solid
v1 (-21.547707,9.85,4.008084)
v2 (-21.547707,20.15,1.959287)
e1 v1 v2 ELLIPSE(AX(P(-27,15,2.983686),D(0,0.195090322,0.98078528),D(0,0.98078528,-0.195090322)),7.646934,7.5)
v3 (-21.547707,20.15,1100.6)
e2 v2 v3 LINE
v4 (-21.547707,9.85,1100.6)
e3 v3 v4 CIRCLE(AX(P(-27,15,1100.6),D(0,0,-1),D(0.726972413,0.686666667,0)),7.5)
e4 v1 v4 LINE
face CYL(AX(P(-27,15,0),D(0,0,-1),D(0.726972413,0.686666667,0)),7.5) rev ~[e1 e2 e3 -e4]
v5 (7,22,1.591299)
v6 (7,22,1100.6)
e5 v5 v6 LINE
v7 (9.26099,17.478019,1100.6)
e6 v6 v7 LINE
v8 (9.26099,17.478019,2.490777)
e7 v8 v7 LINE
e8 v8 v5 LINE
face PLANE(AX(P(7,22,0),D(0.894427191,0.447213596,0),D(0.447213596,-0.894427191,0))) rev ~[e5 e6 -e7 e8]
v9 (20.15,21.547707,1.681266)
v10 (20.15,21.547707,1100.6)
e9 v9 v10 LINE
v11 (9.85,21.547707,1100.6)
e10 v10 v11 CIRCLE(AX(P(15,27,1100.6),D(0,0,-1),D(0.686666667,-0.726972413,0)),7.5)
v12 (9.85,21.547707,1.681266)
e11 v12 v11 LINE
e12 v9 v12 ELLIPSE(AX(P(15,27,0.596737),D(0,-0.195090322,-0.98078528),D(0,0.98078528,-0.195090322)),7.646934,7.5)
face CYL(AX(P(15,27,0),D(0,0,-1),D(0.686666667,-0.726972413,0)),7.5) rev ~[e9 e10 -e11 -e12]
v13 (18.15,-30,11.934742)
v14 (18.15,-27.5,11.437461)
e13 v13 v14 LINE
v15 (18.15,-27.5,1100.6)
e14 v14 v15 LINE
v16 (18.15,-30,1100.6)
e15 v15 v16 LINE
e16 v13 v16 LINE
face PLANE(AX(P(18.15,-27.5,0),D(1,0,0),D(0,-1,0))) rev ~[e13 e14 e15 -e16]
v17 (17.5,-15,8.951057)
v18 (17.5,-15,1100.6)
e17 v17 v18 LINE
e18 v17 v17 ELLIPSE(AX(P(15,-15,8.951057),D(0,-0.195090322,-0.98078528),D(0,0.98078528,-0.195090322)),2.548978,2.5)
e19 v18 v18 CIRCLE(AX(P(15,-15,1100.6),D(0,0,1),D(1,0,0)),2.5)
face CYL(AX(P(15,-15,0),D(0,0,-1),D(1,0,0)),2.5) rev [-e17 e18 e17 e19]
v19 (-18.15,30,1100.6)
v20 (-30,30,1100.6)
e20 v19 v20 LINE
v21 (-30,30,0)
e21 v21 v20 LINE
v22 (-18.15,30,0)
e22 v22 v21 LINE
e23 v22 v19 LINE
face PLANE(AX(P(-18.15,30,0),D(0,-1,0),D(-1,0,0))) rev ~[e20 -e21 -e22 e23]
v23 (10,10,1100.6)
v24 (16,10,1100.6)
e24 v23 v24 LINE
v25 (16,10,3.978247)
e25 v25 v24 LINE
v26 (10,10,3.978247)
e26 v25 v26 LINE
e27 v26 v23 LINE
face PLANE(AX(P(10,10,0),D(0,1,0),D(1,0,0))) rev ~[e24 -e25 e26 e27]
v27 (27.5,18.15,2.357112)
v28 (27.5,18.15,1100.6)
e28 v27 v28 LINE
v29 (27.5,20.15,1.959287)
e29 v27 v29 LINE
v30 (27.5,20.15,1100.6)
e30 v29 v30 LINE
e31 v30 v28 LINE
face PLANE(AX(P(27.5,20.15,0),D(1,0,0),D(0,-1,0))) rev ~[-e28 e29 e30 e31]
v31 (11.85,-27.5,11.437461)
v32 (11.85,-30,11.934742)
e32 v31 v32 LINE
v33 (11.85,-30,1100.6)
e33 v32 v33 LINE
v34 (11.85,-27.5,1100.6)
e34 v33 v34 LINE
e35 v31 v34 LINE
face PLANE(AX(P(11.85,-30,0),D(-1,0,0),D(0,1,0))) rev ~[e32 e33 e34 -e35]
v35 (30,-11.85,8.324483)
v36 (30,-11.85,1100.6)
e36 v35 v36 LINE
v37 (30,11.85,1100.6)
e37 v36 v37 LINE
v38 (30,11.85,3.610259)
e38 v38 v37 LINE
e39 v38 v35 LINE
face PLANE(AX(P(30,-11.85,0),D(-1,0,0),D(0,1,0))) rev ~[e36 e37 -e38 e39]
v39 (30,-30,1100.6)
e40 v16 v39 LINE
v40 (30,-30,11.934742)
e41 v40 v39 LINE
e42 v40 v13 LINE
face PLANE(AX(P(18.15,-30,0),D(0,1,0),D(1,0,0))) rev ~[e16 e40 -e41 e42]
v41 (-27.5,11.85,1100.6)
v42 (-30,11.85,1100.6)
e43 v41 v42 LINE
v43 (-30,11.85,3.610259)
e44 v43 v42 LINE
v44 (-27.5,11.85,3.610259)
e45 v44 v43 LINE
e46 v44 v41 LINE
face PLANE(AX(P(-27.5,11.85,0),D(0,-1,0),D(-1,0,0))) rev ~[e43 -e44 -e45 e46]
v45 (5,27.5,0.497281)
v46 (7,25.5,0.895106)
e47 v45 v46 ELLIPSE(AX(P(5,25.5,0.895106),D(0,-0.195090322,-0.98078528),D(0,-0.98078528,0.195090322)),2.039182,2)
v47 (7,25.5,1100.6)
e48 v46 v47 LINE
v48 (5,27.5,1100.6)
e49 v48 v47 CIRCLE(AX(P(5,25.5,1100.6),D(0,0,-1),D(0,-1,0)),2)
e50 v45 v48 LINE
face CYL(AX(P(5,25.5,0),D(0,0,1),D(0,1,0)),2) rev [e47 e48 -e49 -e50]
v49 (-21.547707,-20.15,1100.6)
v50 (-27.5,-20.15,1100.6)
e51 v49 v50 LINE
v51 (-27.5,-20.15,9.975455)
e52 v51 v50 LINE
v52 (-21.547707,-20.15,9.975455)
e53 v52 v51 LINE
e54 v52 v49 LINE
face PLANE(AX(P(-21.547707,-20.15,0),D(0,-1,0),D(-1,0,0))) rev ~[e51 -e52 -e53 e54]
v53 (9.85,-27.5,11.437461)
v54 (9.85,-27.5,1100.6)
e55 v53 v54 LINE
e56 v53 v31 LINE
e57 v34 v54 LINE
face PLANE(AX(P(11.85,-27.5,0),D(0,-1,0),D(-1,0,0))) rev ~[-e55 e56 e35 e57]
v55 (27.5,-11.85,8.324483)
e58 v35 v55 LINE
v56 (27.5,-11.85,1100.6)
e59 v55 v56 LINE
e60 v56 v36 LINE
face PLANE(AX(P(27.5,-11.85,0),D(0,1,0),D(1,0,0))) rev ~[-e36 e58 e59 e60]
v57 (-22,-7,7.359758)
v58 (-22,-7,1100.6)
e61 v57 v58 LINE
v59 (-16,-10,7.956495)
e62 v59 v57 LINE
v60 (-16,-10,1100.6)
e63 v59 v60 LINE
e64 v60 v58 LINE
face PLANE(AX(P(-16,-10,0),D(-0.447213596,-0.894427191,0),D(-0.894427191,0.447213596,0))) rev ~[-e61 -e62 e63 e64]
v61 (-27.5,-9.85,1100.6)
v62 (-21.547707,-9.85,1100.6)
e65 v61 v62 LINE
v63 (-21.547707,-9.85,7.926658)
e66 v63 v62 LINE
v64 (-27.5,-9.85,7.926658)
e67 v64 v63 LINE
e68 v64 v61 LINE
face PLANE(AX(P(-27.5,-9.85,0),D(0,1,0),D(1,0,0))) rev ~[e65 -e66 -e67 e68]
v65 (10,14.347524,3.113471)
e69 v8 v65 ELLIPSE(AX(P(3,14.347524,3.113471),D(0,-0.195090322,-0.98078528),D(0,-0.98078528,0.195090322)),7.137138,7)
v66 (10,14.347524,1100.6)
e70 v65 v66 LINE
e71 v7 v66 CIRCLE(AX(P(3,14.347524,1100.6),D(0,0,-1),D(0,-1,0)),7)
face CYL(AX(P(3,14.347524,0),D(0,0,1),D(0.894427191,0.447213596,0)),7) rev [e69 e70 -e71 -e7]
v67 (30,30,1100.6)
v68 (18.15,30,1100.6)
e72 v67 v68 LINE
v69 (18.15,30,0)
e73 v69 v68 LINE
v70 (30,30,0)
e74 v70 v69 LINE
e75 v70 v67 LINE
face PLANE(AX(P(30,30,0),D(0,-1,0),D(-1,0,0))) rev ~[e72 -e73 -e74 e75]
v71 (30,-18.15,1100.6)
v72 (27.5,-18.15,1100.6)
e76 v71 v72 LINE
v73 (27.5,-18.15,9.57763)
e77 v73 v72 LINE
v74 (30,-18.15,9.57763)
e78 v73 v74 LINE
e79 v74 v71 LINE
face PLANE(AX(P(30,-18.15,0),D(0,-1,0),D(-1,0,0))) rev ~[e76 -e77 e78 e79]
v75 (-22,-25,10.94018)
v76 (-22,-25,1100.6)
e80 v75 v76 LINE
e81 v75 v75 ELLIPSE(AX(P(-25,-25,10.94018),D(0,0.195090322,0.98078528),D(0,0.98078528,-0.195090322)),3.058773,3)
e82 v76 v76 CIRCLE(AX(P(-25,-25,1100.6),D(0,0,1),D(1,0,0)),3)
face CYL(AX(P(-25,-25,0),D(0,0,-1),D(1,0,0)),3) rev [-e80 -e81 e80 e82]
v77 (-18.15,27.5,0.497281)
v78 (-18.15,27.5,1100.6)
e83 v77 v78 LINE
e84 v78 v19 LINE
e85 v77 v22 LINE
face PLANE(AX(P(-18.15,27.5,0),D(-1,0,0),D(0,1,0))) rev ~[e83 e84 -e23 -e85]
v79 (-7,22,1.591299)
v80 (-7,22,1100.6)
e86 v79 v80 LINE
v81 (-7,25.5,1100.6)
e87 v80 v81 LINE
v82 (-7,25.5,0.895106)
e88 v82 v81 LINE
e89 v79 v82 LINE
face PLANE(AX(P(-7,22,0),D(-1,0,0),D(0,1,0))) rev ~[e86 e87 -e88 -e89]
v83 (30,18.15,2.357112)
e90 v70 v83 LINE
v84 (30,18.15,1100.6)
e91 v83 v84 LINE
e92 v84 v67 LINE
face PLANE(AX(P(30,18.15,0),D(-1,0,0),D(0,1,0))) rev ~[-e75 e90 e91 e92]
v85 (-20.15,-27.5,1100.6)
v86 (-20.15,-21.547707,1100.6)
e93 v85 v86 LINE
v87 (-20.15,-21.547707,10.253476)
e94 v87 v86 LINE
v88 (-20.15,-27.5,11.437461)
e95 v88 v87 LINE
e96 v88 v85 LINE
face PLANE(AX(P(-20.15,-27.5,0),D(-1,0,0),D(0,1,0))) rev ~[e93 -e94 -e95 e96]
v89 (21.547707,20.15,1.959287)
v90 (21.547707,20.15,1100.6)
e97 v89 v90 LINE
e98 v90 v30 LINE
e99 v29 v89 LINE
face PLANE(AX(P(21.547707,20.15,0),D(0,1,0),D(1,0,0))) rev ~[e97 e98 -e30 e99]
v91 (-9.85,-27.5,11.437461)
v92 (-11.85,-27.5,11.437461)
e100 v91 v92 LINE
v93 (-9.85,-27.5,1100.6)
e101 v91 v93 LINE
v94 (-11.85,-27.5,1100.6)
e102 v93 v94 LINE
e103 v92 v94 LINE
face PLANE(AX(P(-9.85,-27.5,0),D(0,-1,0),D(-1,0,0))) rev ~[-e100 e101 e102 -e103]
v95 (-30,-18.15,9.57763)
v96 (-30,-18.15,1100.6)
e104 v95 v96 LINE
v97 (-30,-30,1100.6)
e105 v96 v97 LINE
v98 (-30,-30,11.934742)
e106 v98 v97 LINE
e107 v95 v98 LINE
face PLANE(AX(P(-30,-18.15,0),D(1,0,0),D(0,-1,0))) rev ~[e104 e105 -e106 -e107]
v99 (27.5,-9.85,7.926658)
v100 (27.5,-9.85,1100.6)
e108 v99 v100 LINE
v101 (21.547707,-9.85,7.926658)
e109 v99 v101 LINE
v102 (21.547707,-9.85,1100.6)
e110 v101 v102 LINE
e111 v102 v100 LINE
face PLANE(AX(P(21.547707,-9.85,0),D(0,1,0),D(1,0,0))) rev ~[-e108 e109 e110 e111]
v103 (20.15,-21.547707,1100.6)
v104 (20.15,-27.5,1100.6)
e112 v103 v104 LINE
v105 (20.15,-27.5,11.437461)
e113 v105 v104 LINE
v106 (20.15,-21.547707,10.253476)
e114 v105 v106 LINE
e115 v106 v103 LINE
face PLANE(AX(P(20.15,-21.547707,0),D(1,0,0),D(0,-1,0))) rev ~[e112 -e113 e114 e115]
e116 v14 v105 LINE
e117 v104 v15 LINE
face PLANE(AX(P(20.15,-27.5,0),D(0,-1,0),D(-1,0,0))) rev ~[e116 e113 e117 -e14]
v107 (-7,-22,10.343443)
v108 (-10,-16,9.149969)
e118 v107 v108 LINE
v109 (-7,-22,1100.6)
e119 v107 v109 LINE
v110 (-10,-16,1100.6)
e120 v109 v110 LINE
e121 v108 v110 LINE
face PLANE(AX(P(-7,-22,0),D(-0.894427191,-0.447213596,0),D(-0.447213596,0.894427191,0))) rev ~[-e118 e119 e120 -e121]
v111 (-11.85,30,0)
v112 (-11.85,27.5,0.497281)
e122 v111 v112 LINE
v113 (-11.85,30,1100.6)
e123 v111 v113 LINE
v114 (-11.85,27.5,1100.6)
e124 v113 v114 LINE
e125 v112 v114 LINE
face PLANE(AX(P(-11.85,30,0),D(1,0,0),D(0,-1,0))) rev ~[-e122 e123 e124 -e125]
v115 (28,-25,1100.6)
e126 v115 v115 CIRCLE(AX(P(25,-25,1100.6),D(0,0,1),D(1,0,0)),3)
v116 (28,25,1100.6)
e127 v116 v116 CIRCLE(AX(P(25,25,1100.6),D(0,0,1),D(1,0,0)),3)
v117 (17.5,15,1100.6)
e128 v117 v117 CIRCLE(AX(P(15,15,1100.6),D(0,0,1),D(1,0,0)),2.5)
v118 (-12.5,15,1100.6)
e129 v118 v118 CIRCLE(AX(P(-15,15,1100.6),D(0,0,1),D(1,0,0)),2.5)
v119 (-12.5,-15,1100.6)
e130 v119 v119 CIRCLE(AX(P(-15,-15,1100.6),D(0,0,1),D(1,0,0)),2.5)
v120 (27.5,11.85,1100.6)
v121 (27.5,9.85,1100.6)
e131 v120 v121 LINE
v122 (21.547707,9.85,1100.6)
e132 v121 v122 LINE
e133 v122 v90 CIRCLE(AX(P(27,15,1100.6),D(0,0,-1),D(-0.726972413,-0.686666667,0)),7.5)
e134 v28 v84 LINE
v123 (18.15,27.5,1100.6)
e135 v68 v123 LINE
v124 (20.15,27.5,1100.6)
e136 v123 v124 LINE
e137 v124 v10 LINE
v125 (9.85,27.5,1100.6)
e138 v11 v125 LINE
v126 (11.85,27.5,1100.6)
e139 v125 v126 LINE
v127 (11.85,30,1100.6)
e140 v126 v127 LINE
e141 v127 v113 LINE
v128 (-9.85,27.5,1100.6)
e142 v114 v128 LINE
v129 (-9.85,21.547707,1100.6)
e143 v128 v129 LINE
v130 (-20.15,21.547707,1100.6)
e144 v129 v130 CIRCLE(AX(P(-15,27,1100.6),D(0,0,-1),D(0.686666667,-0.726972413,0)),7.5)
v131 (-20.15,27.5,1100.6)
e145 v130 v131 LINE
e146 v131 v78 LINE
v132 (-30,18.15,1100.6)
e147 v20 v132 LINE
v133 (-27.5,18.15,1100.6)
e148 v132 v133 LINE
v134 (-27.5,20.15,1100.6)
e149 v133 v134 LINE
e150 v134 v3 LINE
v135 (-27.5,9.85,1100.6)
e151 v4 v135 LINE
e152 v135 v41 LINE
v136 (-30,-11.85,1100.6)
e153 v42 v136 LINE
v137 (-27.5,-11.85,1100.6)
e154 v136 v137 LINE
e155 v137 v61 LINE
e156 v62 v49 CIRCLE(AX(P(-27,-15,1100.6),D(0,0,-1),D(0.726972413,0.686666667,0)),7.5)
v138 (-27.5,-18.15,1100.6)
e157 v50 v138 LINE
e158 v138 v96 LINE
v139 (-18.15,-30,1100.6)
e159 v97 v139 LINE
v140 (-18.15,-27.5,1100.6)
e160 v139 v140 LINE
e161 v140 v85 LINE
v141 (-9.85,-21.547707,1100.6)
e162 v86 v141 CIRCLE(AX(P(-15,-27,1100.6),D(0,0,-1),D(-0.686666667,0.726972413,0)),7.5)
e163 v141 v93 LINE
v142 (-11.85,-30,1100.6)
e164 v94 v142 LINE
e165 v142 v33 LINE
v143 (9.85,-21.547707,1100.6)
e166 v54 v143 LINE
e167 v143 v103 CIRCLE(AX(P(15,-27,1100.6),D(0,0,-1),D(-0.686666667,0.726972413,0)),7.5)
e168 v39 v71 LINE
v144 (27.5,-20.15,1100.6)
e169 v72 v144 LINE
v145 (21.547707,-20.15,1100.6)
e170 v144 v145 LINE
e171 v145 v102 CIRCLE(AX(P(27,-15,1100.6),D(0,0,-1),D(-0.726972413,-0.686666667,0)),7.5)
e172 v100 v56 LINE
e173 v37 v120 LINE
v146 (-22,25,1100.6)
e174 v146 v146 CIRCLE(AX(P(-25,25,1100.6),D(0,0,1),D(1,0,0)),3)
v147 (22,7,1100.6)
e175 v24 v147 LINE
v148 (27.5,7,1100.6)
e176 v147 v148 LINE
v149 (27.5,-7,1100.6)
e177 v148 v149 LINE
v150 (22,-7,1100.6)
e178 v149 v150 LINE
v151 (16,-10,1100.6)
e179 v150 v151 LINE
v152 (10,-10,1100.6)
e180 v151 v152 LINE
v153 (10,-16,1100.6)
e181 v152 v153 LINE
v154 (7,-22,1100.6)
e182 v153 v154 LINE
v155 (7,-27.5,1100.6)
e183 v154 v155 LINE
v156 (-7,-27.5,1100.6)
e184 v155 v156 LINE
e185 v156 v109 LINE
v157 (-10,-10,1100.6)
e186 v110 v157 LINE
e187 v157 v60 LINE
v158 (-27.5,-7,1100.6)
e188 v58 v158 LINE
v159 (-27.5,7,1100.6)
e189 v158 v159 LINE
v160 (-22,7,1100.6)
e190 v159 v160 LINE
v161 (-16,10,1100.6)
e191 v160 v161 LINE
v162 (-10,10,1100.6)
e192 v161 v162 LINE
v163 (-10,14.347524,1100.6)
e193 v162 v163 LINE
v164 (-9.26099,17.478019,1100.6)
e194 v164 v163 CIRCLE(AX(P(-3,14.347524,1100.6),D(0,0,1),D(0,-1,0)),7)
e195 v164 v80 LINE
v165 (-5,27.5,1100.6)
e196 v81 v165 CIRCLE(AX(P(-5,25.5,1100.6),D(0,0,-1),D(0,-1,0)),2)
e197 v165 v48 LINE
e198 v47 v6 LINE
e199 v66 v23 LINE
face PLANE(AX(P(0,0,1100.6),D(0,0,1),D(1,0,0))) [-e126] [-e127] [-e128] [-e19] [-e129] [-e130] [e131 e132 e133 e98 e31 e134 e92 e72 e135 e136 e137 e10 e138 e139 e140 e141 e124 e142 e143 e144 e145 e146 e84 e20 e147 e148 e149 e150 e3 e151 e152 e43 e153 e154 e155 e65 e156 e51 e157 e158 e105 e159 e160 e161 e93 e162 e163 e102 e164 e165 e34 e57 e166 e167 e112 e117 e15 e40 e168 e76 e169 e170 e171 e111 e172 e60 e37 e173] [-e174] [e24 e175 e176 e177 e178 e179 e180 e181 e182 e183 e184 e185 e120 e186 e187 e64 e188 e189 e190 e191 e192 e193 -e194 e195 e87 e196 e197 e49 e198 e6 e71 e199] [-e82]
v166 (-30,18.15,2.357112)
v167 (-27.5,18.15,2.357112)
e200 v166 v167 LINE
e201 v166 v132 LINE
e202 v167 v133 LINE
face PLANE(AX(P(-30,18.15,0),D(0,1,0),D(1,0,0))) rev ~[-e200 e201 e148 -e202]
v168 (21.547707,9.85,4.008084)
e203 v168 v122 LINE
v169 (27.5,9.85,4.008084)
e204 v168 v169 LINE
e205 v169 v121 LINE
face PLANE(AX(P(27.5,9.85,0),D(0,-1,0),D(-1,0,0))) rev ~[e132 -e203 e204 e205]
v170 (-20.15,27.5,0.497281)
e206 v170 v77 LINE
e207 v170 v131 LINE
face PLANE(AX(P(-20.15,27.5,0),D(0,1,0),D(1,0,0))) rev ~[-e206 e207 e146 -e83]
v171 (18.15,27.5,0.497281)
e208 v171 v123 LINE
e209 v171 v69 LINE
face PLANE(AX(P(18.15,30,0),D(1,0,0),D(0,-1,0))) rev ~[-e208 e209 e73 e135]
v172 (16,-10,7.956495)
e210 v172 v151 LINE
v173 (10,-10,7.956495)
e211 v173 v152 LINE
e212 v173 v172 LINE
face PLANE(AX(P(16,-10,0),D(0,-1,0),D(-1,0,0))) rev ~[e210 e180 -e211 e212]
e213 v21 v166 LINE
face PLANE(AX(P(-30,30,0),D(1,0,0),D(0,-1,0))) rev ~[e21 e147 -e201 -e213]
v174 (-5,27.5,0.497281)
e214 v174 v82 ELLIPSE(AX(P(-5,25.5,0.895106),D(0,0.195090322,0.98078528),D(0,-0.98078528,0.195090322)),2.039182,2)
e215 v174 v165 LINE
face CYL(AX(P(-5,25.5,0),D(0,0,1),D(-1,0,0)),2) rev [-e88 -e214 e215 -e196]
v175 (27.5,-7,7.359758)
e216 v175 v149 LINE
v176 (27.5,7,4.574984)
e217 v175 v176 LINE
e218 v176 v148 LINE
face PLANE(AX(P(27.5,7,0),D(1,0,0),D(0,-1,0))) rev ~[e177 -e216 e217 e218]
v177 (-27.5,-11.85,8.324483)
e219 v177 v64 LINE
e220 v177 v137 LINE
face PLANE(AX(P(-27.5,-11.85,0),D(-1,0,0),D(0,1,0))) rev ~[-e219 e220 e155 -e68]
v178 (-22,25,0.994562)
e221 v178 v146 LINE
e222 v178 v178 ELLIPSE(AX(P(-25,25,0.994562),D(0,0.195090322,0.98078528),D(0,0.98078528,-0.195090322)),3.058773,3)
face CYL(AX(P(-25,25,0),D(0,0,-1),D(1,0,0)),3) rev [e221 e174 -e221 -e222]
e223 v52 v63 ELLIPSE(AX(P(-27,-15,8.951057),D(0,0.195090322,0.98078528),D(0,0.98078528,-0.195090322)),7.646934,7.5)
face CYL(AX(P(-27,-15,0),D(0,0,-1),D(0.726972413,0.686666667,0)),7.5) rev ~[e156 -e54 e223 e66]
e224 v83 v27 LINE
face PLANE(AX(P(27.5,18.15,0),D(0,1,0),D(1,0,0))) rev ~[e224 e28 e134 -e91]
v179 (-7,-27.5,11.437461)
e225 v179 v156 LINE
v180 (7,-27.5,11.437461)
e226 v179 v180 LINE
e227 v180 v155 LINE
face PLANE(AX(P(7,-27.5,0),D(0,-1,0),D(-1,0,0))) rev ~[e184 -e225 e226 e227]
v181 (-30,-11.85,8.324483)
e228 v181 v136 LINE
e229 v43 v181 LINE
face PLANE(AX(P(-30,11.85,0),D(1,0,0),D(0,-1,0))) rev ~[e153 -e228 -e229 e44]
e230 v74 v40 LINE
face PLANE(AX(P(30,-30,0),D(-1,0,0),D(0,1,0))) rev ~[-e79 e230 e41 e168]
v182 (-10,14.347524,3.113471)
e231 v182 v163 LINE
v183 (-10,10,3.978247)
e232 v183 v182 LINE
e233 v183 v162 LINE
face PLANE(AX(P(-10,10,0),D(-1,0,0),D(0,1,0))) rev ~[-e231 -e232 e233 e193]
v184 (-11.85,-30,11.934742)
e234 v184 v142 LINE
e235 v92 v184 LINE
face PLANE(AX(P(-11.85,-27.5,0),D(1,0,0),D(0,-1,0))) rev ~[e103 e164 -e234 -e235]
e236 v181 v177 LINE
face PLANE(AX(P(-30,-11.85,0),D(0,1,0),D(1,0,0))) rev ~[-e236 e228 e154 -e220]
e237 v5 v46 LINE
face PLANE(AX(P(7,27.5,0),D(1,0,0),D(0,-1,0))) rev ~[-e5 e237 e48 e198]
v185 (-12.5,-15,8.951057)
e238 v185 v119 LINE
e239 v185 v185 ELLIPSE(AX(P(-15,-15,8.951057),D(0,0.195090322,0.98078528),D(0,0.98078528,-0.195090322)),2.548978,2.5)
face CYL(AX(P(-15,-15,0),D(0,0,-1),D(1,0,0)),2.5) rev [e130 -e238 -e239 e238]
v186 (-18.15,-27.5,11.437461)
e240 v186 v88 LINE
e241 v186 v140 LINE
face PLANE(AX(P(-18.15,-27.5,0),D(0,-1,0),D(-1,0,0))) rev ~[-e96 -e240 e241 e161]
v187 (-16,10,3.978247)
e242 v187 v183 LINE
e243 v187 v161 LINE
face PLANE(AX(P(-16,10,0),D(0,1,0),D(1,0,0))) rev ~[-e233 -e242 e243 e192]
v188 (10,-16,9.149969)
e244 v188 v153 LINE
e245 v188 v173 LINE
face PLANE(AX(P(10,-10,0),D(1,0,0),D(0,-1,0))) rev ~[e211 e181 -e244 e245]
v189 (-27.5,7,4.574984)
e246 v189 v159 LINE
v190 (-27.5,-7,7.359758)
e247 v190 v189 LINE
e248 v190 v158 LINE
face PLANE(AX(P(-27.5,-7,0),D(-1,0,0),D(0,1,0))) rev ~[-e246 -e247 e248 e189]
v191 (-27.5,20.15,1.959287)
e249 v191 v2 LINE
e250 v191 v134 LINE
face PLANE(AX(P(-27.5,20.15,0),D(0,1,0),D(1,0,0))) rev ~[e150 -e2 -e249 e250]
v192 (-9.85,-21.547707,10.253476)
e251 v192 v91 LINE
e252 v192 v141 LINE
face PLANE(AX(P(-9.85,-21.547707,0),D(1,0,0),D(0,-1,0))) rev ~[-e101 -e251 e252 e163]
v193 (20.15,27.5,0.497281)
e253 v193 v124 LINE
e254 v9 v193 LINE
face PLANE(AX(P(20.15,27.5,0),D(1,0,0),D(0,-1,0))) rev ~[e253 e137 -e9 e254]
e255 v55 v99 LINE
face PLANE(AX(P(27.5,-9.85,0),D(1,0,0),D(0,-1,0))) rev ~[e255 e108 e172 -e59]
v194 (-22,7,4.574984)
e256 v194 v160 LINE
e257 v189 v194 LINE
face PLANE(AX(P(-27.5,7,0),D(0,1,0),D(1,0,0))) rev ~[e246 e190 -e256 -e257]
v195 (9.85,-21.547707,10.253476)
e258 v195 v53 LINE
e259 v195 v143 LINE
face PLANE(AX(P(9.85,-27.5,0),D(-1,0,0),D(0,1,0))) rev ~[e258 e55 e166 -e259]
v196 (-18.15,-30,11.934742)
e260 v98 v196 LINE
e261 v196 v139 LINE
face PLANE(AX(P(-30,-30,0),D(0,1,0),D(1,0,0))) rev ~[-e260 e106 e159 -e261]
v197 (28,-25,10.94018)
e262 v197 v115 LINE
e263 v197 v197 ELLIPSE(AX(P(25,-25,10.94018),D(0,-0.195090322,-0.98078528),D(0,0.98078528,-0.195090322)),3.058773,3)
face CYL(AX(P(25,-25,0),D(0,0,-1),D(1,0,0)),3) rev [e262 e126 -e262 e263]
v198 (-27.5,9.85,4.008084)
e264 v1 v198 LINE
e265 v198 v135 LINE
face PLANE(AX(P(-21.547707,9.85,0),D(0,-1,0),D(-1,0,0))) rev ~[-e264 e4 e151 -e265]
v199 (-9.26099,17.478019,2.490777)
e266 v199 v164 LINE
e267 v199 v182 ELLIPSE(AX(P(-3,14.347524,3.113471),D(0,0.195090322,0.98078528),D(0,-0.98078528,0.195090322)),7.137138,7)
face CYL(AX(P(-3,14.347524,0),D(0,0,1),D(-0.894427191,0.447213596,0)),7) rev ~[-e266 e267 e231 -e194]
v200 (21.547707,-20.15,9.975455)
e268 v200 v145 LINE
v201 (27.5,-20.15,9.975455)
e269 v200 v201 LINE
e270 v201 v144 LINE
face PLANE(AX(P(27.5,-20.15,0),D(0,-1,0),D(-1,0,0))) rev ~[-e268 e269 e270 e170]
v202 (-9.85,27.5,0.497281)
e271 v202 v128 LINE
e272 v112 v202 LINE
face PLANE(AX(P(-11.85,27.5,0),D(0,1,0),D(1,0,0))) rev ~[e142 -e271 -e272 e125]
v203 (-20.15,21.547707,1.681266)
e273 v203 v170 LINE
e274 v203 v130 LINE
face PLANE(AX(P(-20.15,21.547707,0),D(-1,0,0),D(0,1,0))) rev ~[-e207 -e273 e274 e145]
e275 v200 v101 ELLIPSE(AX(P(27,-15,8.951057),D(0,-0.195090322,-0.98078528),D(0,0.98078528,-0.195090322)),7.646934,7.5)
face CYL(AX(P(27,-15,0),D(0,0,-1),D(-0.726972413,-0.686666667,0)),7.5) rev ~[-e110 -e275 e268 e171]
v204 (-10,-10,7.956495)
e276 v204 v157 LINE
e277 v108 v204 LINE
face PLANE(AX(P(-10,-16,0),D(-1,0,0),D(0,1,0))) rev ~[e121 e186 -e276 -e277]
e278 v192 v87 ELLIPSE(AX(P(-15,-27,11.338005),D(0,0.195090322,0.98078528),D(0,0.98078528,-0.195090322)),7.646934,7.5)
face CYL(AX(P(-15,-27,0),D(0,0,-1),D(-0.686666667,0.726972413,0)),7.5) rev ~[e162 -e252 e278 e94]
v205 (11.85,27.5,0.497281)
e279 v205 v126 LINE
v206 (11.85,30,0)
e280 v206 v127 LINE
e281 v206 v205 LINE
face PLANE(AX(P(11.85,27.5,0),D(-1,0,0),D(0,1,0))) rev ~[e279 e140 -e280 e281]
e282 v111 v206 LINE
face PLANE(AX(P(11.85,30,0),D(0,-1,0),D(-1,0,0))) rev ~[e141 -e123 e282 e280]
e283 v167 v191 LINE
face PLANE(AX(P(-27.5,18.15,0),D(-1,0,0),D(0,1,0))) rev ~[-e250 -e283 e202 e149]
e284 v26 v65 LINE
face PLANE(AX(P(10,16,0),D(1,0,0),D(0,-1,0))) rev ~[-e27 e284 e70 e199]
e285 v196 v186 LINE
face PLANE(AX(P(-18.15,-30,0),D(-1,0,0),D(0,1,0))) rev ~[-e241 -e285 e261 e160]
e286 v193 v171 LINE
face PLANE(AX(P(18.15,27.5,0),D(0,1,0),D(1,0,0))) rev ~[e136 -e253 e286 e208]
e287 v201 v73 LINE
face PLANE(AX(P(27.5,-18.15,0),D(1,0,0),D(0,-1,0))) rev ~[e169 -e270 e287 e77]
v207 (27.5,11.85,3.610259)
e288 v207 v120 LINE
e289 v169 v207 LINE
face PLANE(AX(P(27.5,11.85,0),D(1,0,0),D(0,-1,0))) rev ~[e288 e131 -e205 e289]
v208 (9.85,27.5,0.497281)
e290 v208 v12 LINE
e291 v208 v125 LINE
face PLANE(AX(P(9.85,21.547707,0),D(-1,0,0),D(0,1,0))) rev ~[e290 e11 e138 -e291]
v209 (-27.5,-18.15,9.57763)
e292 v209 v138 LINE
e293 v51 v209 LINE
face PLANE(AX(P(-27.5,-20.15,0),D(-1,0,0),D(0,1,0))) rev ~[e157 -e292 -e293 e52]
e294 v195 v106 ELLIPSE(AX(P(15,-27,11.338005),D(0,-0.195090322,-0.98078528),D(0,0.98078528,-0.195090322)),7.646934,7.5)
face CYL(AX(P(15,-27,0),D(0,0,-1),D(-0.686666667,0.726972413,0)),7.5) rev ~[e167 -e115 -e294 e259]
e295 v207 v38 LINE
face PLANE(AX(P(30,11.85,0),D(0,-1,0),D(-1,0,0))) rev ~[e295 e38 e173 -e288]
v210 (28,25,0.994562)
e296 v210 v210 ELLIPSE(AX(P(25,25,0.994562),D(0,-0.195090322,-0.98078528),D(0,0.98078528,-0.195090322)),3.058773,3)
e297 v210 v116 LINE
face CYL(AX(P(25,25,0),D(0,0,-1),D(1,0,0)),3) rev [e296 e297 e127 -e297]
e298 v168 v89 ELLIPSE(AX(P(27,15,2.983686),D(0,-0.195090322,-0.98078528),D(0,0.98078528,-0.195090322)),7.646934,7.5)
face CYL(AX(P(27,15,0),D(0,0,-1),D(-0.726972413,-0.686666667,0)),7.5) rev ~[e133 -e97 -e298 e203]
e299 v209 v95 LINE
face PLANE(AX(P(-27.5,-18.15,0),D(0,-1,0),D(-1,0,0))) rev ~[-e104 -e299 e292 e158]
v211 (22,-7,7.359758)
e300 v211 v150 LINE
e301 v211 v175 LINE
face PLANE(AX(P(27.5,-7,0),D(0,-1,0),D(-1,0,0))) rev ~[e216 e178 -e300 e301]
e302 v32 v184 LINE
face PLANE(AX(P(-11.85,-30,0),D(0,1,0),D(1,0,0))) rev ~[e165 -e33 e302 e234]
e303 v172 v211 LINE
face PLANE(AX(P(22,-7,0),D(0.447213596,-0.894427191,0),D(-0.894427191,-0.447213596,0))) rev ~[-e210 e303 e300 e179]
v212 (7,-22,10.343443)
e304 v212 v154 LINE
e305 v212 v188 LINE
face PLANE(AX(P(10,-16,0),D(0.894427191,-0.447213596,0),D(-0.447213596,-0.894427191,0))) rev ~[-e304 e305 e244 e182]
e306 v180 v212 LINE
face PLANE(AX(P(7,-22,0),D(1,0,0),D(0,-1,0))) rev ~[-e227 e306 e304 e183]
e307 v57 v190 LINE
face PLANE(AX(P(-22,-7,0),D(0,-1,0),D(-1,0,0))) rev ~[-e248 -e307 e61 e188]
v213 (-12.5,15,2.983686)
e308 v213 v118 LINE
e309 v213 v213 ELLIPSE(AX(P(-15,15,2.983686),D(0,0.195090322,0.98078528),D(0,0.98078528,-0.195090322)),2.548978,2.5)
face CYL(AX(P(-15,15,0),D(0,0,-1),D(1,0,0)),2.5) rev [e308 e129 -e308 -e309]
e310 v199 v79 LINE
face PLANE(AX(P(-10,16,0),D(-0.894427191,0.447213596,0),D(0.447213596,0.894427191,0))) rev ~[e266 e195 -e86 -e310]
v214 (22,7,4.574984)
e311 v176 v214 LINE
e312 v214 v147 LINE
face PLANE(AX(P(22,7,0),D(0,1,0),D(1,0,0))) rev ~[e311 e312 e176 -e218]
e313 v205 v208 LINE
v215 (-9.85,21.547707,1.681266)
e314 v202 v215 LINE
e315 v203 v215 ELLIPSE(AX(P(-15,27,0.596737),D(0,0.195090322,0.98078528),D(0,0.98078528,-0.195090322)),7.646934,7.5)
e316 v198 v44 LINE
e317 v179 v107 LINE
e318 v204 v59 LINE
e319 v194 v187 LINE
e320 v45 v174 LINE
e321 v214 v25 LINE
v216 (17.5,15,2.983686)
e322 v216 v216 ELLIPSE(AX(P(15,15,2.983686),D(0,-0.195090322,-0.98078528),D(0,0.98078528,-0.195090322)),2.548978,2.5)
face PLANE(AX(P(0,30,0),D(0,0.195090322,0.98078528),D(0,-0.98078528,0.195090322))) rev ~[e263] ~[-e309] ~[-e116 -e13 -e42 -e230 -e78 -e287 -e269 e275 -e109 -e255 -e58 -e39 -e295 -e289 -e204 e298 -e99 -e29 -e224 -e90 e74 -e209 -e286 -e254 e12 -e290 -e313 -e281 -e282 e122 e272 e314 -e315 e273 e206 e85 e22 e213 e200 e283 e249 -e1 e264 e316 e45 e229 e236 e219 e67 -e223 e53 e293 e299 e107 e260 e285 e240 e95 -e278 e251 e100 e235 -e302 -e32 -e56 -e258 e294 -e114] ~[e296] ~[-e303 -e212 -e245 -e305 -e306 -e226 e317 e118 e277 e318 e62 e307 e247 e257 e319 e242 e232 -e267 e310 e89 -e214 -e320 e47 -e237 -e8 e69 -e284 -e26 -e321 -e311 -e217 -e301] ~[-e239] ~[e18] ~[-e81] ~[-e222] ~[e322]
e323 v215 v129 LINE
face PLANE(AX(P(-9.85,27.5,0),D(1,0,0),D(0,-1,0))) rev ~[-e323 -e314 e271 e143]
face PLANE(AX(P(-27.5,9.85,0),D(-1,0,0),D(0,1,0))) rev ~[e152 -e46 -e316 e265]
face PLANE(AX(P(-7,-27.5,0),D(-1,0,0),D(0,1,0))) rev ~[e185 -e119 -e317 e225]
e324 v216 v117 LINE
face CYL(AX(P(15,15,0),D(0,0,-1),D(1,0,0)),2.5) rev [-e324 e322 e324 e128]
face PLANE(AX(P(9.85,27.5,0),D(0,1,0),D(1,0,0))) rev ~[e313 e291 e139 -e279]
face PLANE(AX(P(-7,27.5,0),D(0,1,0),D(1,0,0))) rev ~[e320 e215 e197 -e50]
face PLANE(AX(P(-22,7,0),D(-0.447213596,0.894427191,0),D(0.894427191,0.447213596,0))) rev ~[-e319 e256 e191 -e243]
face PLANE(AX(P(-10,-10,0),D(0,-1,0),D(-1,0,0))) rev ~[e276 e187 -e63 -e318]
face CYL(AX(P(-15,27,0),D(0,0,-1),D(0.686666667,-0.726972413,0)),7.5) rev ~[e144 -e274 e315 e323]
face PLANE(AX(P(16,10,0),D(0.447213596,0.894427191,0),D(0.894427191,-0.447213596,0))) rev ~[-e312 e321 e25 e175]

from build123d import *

# Parameters (mm, degrees)
F0_R          = 3
F0_R_2        = 2.5
F1_DEPTH      = 1100.6
F2_R          = 2
F3_R          = 7
F5_DEPTH      = 30
F5_DEPTH_BACK = 30


# Not quite as in the source:
# - a feature names something its author has since deleted; it is built from what else it names


with BuildPart() as f1:
    # F0 (on Top) → F1 (new body)
    with BuildSketch(Plane.XY):
        with BuildLine():
            Line((18.15, -30), (30, -30))
            Line((30, -30), (30, -18.15))
            Line((30, -18.15), (27.5, -18.15))
            Line((27.5, -18.15), (27.5, -20.15))
            Line((27.5, -20.15), (21.5477069044, -20.15))
            ThreePointArc((21.5477069044, -20.15), (19.5, -15), (21.5477069044, -9.85))
            Line((21.5477069044, -9.85), (27.5, -9.85))
            Line((27.5, -9.85), (27.5, -11.85))
            Line((27.5, -11.85), (30, -11.85))
            Line((30, -11.85), (30, 11.85))
            Line((30, 11.85), (27.5, 11.85))
            Line((27.5, 11.85), (27.5, 9.85))
            Line((27.5, 9.85), (21.5477069044, 9.85))
            ThreePointArc((21.5477069044, 9.85), (19.5, 15), (21.5477069044, 20.15))
            Line((21.5477069044, 20.15), (27.5, 20.15))
            Line((27.5, 20.15), (27.5, 18.15))
            Line((27.5, 18.15), (30, 18.15))
            Line((30, 18.15), (30, 30))
            Line((30, 30), (18.15, 30))
            Line((18.15, 30), (18.15, 27.5))
            Line((18.15, 27.5), (20.15, 27.5))
            Line((20.15, 27.5), (20.15, 21.5477069044))
            ThreePointArc((20.15, 21.5477069044), (15, 19.5), (9.85, 21.5477069044))
            Line((9.85, 21.5477069044), (9.85, 27.5))
            Line((9.85, 27.5), (11.85, 27.5))
            Line((11.85, 27.5), (11.85, 30))
            Line((11.85, 30), (-11.85, 30))
            Line((-11.85, 30), (-11.85, 27.5))
            Line((-11.85, 27.5), (-9.85, 27.5))
            Line((-9.85, 27.5), (-9.85, 21.5477069044))
            ThreePointArc((-9.85, 21.5477069044), (-15, 19.5), (-20.15, 21.5477069044))
            Line((-20.15, 21.5477069044), (-20.15, 27.5))
            Line((-20.15, 27.5), (-18.15, 27.5))
            Line((-18.15, 27.5), (-18.15, 30))
            Line((-18.15, 30), (-30, 30))
            Line((-30, 30), (-30, 18.15))
            Line((-30, 18.15), (-27.5, 18.15))
            Line((-27.5, 18.15), (-27.5, 20.15))
            Line((-27.5, 20.15), (-21.5477069044, 20.15))
            ThreePointArc((-21.5477069044, 20.15), (-19.5, 15), (-21.5477069044, 9.85))
            Line((-21.5477069044, 9.85), (-27.5, 9.85))
            Line((-27.5, 9.85), (-27.5, 11.85))
            Line((-27.5, 11.85), (-30, 11.85))
            Line((-30, 11.85), (-30, -11.85))
            Line((-30, -11.85), (-27.5, -11.85))
            Line((-27.5, -11.85), (-27.5, -9.85))
            Line((-27.5, -9.85), (-21.5477069044, -9.85))
            ThreePointArc((-21.5477069044, -9.85), (-19.5, -15), (-21.5477069044, -20.15))
            Line((-21.5477069044, -20.15), (-27.5, -20.15))
            Line((-27.5, -20.15), (-27.5, -18.15))
            Line((-27.5, -18.15), (-30, -18.15))
            Line((-30, -18.15), (-30, -30))
            Line((-30, -30), (-18.15, -30))
            Line((-18.15, -30), (-18.15, -27.5))
            Line((-18.15, -27.5), (-20.15, -27.5))
            Line((-20.15, -27.5), (-20.15, -21.5477069044))
            ThreePointArc((-20.15, -21.5477069044), (-15, -19.5), (-9.85, -21.5477069044))
            Line((-9.85, -21.5477069044), (-9.85, -27.5))
            Line((-9.85, -27.5), (-11.85, -27.5))
            Line((-11.85, -27.5), (-11.85, -30))
            Line((-11.85, -30), (11.85, -30))
            Line((11.85, -30), (11.85, -27.5))
            Line((11.85, -27.5), (9.85, -27.5))
            Line((9.85, -27.5), (9.85, -21.5477069044))
            ThreePointArc((9.85, -21.5477069044), (15, -19.5), (20.15, -21.5477069044))
            Line((20.15, -21.5477069044), (20.15, -27.5))
            Line((20.15, -27.5), (18.15, -27.5))
            Line((18.15, -27.5), (18.15, -30))
        make_face()
        with Locations((-25, -25)):
            Circle(F0_R, mode=Mode.SUBTRACT)
        with Locations((-15, -15)):
            Circle(F0_R_2, mode=Mode.SUBTRACT)
        with Locations((25, -25)):
            Circle(F0_R, mode=Mode.SUBTRACT)
        with Locations((15, -15)):
            Circle(F0_R_2, mode=Mode.SUBTRACT)
        with Locations((-25, 25)):
            Circle(F0_R, mode=Mode.SUBTRACT)
        with Locations((-15, 15)):
            Circle(F0_R_2, mode=Mode.SUBTRACT)
        Polygon((-7, 22), (-7, 27.5), (0, 27.5), (7, 27.5), (7, 22), (10, 16), (10, 10), (16, 10), (22, 7), (27.5, 7), (27.5, 0), (27.5, -7), (22, -7), (16, -10), (10, -10), (10, -16), (7, -22), (7, -27.5), (0, -27.5), (-7, -27.5), (-7, -22), (-10, -16), (-10, -10), (-16, -10), (-22, -7), (-27.5, -7), (-27.5, 0), (-27.5, 7), (-22, 7), (-16, 10), (-10, 10), (-10, 16), align=None, mode=Mode.SUBTRACT)
        with Locations((15, 15)):
            Circle(F0_R_2, mode=Mode.SUBTRACT)
        with Locations((25, 25)):
            Circle(F0_R, mode=Mode.SUBTRACT)
    extrude(amount=F1_DEPTH)

    # F2
    f2_edges = [f1.edges().sort_by_distance(p)[0] for p in [
        (-7, 27.5, 550.3),
        (7, 27.5, 550.3),
    ]]
    fillet(f2_edges, radius=F2_R)

    # F3
    f3_edges = [f1.edges().sort_by_distance(p)[0] for p in [
        (-10, 16, 550.3),
        (10, 16, 550.3),
    ]]
    fillet(f3_edges, radius=F3_R)

    # F4 (on Right) → F5 (cut, two sides)
    with BuildSketch(Plane.YZ) as f5_sk:
        Polygon((-164.2855995683, 38.6458085579), (-188.5911429791, -83.5464097089), (5.6944565892, -122.1922182668), (30, 0), align=None)
    extrude(amount=F5_DEPTH, mode=Mode.SUBTRACT)
    extrude(f5_sk.sketch, amount=-F5_DEPTH_BACK, mode=Mode.SUBTRACT)


solid = f1.part
